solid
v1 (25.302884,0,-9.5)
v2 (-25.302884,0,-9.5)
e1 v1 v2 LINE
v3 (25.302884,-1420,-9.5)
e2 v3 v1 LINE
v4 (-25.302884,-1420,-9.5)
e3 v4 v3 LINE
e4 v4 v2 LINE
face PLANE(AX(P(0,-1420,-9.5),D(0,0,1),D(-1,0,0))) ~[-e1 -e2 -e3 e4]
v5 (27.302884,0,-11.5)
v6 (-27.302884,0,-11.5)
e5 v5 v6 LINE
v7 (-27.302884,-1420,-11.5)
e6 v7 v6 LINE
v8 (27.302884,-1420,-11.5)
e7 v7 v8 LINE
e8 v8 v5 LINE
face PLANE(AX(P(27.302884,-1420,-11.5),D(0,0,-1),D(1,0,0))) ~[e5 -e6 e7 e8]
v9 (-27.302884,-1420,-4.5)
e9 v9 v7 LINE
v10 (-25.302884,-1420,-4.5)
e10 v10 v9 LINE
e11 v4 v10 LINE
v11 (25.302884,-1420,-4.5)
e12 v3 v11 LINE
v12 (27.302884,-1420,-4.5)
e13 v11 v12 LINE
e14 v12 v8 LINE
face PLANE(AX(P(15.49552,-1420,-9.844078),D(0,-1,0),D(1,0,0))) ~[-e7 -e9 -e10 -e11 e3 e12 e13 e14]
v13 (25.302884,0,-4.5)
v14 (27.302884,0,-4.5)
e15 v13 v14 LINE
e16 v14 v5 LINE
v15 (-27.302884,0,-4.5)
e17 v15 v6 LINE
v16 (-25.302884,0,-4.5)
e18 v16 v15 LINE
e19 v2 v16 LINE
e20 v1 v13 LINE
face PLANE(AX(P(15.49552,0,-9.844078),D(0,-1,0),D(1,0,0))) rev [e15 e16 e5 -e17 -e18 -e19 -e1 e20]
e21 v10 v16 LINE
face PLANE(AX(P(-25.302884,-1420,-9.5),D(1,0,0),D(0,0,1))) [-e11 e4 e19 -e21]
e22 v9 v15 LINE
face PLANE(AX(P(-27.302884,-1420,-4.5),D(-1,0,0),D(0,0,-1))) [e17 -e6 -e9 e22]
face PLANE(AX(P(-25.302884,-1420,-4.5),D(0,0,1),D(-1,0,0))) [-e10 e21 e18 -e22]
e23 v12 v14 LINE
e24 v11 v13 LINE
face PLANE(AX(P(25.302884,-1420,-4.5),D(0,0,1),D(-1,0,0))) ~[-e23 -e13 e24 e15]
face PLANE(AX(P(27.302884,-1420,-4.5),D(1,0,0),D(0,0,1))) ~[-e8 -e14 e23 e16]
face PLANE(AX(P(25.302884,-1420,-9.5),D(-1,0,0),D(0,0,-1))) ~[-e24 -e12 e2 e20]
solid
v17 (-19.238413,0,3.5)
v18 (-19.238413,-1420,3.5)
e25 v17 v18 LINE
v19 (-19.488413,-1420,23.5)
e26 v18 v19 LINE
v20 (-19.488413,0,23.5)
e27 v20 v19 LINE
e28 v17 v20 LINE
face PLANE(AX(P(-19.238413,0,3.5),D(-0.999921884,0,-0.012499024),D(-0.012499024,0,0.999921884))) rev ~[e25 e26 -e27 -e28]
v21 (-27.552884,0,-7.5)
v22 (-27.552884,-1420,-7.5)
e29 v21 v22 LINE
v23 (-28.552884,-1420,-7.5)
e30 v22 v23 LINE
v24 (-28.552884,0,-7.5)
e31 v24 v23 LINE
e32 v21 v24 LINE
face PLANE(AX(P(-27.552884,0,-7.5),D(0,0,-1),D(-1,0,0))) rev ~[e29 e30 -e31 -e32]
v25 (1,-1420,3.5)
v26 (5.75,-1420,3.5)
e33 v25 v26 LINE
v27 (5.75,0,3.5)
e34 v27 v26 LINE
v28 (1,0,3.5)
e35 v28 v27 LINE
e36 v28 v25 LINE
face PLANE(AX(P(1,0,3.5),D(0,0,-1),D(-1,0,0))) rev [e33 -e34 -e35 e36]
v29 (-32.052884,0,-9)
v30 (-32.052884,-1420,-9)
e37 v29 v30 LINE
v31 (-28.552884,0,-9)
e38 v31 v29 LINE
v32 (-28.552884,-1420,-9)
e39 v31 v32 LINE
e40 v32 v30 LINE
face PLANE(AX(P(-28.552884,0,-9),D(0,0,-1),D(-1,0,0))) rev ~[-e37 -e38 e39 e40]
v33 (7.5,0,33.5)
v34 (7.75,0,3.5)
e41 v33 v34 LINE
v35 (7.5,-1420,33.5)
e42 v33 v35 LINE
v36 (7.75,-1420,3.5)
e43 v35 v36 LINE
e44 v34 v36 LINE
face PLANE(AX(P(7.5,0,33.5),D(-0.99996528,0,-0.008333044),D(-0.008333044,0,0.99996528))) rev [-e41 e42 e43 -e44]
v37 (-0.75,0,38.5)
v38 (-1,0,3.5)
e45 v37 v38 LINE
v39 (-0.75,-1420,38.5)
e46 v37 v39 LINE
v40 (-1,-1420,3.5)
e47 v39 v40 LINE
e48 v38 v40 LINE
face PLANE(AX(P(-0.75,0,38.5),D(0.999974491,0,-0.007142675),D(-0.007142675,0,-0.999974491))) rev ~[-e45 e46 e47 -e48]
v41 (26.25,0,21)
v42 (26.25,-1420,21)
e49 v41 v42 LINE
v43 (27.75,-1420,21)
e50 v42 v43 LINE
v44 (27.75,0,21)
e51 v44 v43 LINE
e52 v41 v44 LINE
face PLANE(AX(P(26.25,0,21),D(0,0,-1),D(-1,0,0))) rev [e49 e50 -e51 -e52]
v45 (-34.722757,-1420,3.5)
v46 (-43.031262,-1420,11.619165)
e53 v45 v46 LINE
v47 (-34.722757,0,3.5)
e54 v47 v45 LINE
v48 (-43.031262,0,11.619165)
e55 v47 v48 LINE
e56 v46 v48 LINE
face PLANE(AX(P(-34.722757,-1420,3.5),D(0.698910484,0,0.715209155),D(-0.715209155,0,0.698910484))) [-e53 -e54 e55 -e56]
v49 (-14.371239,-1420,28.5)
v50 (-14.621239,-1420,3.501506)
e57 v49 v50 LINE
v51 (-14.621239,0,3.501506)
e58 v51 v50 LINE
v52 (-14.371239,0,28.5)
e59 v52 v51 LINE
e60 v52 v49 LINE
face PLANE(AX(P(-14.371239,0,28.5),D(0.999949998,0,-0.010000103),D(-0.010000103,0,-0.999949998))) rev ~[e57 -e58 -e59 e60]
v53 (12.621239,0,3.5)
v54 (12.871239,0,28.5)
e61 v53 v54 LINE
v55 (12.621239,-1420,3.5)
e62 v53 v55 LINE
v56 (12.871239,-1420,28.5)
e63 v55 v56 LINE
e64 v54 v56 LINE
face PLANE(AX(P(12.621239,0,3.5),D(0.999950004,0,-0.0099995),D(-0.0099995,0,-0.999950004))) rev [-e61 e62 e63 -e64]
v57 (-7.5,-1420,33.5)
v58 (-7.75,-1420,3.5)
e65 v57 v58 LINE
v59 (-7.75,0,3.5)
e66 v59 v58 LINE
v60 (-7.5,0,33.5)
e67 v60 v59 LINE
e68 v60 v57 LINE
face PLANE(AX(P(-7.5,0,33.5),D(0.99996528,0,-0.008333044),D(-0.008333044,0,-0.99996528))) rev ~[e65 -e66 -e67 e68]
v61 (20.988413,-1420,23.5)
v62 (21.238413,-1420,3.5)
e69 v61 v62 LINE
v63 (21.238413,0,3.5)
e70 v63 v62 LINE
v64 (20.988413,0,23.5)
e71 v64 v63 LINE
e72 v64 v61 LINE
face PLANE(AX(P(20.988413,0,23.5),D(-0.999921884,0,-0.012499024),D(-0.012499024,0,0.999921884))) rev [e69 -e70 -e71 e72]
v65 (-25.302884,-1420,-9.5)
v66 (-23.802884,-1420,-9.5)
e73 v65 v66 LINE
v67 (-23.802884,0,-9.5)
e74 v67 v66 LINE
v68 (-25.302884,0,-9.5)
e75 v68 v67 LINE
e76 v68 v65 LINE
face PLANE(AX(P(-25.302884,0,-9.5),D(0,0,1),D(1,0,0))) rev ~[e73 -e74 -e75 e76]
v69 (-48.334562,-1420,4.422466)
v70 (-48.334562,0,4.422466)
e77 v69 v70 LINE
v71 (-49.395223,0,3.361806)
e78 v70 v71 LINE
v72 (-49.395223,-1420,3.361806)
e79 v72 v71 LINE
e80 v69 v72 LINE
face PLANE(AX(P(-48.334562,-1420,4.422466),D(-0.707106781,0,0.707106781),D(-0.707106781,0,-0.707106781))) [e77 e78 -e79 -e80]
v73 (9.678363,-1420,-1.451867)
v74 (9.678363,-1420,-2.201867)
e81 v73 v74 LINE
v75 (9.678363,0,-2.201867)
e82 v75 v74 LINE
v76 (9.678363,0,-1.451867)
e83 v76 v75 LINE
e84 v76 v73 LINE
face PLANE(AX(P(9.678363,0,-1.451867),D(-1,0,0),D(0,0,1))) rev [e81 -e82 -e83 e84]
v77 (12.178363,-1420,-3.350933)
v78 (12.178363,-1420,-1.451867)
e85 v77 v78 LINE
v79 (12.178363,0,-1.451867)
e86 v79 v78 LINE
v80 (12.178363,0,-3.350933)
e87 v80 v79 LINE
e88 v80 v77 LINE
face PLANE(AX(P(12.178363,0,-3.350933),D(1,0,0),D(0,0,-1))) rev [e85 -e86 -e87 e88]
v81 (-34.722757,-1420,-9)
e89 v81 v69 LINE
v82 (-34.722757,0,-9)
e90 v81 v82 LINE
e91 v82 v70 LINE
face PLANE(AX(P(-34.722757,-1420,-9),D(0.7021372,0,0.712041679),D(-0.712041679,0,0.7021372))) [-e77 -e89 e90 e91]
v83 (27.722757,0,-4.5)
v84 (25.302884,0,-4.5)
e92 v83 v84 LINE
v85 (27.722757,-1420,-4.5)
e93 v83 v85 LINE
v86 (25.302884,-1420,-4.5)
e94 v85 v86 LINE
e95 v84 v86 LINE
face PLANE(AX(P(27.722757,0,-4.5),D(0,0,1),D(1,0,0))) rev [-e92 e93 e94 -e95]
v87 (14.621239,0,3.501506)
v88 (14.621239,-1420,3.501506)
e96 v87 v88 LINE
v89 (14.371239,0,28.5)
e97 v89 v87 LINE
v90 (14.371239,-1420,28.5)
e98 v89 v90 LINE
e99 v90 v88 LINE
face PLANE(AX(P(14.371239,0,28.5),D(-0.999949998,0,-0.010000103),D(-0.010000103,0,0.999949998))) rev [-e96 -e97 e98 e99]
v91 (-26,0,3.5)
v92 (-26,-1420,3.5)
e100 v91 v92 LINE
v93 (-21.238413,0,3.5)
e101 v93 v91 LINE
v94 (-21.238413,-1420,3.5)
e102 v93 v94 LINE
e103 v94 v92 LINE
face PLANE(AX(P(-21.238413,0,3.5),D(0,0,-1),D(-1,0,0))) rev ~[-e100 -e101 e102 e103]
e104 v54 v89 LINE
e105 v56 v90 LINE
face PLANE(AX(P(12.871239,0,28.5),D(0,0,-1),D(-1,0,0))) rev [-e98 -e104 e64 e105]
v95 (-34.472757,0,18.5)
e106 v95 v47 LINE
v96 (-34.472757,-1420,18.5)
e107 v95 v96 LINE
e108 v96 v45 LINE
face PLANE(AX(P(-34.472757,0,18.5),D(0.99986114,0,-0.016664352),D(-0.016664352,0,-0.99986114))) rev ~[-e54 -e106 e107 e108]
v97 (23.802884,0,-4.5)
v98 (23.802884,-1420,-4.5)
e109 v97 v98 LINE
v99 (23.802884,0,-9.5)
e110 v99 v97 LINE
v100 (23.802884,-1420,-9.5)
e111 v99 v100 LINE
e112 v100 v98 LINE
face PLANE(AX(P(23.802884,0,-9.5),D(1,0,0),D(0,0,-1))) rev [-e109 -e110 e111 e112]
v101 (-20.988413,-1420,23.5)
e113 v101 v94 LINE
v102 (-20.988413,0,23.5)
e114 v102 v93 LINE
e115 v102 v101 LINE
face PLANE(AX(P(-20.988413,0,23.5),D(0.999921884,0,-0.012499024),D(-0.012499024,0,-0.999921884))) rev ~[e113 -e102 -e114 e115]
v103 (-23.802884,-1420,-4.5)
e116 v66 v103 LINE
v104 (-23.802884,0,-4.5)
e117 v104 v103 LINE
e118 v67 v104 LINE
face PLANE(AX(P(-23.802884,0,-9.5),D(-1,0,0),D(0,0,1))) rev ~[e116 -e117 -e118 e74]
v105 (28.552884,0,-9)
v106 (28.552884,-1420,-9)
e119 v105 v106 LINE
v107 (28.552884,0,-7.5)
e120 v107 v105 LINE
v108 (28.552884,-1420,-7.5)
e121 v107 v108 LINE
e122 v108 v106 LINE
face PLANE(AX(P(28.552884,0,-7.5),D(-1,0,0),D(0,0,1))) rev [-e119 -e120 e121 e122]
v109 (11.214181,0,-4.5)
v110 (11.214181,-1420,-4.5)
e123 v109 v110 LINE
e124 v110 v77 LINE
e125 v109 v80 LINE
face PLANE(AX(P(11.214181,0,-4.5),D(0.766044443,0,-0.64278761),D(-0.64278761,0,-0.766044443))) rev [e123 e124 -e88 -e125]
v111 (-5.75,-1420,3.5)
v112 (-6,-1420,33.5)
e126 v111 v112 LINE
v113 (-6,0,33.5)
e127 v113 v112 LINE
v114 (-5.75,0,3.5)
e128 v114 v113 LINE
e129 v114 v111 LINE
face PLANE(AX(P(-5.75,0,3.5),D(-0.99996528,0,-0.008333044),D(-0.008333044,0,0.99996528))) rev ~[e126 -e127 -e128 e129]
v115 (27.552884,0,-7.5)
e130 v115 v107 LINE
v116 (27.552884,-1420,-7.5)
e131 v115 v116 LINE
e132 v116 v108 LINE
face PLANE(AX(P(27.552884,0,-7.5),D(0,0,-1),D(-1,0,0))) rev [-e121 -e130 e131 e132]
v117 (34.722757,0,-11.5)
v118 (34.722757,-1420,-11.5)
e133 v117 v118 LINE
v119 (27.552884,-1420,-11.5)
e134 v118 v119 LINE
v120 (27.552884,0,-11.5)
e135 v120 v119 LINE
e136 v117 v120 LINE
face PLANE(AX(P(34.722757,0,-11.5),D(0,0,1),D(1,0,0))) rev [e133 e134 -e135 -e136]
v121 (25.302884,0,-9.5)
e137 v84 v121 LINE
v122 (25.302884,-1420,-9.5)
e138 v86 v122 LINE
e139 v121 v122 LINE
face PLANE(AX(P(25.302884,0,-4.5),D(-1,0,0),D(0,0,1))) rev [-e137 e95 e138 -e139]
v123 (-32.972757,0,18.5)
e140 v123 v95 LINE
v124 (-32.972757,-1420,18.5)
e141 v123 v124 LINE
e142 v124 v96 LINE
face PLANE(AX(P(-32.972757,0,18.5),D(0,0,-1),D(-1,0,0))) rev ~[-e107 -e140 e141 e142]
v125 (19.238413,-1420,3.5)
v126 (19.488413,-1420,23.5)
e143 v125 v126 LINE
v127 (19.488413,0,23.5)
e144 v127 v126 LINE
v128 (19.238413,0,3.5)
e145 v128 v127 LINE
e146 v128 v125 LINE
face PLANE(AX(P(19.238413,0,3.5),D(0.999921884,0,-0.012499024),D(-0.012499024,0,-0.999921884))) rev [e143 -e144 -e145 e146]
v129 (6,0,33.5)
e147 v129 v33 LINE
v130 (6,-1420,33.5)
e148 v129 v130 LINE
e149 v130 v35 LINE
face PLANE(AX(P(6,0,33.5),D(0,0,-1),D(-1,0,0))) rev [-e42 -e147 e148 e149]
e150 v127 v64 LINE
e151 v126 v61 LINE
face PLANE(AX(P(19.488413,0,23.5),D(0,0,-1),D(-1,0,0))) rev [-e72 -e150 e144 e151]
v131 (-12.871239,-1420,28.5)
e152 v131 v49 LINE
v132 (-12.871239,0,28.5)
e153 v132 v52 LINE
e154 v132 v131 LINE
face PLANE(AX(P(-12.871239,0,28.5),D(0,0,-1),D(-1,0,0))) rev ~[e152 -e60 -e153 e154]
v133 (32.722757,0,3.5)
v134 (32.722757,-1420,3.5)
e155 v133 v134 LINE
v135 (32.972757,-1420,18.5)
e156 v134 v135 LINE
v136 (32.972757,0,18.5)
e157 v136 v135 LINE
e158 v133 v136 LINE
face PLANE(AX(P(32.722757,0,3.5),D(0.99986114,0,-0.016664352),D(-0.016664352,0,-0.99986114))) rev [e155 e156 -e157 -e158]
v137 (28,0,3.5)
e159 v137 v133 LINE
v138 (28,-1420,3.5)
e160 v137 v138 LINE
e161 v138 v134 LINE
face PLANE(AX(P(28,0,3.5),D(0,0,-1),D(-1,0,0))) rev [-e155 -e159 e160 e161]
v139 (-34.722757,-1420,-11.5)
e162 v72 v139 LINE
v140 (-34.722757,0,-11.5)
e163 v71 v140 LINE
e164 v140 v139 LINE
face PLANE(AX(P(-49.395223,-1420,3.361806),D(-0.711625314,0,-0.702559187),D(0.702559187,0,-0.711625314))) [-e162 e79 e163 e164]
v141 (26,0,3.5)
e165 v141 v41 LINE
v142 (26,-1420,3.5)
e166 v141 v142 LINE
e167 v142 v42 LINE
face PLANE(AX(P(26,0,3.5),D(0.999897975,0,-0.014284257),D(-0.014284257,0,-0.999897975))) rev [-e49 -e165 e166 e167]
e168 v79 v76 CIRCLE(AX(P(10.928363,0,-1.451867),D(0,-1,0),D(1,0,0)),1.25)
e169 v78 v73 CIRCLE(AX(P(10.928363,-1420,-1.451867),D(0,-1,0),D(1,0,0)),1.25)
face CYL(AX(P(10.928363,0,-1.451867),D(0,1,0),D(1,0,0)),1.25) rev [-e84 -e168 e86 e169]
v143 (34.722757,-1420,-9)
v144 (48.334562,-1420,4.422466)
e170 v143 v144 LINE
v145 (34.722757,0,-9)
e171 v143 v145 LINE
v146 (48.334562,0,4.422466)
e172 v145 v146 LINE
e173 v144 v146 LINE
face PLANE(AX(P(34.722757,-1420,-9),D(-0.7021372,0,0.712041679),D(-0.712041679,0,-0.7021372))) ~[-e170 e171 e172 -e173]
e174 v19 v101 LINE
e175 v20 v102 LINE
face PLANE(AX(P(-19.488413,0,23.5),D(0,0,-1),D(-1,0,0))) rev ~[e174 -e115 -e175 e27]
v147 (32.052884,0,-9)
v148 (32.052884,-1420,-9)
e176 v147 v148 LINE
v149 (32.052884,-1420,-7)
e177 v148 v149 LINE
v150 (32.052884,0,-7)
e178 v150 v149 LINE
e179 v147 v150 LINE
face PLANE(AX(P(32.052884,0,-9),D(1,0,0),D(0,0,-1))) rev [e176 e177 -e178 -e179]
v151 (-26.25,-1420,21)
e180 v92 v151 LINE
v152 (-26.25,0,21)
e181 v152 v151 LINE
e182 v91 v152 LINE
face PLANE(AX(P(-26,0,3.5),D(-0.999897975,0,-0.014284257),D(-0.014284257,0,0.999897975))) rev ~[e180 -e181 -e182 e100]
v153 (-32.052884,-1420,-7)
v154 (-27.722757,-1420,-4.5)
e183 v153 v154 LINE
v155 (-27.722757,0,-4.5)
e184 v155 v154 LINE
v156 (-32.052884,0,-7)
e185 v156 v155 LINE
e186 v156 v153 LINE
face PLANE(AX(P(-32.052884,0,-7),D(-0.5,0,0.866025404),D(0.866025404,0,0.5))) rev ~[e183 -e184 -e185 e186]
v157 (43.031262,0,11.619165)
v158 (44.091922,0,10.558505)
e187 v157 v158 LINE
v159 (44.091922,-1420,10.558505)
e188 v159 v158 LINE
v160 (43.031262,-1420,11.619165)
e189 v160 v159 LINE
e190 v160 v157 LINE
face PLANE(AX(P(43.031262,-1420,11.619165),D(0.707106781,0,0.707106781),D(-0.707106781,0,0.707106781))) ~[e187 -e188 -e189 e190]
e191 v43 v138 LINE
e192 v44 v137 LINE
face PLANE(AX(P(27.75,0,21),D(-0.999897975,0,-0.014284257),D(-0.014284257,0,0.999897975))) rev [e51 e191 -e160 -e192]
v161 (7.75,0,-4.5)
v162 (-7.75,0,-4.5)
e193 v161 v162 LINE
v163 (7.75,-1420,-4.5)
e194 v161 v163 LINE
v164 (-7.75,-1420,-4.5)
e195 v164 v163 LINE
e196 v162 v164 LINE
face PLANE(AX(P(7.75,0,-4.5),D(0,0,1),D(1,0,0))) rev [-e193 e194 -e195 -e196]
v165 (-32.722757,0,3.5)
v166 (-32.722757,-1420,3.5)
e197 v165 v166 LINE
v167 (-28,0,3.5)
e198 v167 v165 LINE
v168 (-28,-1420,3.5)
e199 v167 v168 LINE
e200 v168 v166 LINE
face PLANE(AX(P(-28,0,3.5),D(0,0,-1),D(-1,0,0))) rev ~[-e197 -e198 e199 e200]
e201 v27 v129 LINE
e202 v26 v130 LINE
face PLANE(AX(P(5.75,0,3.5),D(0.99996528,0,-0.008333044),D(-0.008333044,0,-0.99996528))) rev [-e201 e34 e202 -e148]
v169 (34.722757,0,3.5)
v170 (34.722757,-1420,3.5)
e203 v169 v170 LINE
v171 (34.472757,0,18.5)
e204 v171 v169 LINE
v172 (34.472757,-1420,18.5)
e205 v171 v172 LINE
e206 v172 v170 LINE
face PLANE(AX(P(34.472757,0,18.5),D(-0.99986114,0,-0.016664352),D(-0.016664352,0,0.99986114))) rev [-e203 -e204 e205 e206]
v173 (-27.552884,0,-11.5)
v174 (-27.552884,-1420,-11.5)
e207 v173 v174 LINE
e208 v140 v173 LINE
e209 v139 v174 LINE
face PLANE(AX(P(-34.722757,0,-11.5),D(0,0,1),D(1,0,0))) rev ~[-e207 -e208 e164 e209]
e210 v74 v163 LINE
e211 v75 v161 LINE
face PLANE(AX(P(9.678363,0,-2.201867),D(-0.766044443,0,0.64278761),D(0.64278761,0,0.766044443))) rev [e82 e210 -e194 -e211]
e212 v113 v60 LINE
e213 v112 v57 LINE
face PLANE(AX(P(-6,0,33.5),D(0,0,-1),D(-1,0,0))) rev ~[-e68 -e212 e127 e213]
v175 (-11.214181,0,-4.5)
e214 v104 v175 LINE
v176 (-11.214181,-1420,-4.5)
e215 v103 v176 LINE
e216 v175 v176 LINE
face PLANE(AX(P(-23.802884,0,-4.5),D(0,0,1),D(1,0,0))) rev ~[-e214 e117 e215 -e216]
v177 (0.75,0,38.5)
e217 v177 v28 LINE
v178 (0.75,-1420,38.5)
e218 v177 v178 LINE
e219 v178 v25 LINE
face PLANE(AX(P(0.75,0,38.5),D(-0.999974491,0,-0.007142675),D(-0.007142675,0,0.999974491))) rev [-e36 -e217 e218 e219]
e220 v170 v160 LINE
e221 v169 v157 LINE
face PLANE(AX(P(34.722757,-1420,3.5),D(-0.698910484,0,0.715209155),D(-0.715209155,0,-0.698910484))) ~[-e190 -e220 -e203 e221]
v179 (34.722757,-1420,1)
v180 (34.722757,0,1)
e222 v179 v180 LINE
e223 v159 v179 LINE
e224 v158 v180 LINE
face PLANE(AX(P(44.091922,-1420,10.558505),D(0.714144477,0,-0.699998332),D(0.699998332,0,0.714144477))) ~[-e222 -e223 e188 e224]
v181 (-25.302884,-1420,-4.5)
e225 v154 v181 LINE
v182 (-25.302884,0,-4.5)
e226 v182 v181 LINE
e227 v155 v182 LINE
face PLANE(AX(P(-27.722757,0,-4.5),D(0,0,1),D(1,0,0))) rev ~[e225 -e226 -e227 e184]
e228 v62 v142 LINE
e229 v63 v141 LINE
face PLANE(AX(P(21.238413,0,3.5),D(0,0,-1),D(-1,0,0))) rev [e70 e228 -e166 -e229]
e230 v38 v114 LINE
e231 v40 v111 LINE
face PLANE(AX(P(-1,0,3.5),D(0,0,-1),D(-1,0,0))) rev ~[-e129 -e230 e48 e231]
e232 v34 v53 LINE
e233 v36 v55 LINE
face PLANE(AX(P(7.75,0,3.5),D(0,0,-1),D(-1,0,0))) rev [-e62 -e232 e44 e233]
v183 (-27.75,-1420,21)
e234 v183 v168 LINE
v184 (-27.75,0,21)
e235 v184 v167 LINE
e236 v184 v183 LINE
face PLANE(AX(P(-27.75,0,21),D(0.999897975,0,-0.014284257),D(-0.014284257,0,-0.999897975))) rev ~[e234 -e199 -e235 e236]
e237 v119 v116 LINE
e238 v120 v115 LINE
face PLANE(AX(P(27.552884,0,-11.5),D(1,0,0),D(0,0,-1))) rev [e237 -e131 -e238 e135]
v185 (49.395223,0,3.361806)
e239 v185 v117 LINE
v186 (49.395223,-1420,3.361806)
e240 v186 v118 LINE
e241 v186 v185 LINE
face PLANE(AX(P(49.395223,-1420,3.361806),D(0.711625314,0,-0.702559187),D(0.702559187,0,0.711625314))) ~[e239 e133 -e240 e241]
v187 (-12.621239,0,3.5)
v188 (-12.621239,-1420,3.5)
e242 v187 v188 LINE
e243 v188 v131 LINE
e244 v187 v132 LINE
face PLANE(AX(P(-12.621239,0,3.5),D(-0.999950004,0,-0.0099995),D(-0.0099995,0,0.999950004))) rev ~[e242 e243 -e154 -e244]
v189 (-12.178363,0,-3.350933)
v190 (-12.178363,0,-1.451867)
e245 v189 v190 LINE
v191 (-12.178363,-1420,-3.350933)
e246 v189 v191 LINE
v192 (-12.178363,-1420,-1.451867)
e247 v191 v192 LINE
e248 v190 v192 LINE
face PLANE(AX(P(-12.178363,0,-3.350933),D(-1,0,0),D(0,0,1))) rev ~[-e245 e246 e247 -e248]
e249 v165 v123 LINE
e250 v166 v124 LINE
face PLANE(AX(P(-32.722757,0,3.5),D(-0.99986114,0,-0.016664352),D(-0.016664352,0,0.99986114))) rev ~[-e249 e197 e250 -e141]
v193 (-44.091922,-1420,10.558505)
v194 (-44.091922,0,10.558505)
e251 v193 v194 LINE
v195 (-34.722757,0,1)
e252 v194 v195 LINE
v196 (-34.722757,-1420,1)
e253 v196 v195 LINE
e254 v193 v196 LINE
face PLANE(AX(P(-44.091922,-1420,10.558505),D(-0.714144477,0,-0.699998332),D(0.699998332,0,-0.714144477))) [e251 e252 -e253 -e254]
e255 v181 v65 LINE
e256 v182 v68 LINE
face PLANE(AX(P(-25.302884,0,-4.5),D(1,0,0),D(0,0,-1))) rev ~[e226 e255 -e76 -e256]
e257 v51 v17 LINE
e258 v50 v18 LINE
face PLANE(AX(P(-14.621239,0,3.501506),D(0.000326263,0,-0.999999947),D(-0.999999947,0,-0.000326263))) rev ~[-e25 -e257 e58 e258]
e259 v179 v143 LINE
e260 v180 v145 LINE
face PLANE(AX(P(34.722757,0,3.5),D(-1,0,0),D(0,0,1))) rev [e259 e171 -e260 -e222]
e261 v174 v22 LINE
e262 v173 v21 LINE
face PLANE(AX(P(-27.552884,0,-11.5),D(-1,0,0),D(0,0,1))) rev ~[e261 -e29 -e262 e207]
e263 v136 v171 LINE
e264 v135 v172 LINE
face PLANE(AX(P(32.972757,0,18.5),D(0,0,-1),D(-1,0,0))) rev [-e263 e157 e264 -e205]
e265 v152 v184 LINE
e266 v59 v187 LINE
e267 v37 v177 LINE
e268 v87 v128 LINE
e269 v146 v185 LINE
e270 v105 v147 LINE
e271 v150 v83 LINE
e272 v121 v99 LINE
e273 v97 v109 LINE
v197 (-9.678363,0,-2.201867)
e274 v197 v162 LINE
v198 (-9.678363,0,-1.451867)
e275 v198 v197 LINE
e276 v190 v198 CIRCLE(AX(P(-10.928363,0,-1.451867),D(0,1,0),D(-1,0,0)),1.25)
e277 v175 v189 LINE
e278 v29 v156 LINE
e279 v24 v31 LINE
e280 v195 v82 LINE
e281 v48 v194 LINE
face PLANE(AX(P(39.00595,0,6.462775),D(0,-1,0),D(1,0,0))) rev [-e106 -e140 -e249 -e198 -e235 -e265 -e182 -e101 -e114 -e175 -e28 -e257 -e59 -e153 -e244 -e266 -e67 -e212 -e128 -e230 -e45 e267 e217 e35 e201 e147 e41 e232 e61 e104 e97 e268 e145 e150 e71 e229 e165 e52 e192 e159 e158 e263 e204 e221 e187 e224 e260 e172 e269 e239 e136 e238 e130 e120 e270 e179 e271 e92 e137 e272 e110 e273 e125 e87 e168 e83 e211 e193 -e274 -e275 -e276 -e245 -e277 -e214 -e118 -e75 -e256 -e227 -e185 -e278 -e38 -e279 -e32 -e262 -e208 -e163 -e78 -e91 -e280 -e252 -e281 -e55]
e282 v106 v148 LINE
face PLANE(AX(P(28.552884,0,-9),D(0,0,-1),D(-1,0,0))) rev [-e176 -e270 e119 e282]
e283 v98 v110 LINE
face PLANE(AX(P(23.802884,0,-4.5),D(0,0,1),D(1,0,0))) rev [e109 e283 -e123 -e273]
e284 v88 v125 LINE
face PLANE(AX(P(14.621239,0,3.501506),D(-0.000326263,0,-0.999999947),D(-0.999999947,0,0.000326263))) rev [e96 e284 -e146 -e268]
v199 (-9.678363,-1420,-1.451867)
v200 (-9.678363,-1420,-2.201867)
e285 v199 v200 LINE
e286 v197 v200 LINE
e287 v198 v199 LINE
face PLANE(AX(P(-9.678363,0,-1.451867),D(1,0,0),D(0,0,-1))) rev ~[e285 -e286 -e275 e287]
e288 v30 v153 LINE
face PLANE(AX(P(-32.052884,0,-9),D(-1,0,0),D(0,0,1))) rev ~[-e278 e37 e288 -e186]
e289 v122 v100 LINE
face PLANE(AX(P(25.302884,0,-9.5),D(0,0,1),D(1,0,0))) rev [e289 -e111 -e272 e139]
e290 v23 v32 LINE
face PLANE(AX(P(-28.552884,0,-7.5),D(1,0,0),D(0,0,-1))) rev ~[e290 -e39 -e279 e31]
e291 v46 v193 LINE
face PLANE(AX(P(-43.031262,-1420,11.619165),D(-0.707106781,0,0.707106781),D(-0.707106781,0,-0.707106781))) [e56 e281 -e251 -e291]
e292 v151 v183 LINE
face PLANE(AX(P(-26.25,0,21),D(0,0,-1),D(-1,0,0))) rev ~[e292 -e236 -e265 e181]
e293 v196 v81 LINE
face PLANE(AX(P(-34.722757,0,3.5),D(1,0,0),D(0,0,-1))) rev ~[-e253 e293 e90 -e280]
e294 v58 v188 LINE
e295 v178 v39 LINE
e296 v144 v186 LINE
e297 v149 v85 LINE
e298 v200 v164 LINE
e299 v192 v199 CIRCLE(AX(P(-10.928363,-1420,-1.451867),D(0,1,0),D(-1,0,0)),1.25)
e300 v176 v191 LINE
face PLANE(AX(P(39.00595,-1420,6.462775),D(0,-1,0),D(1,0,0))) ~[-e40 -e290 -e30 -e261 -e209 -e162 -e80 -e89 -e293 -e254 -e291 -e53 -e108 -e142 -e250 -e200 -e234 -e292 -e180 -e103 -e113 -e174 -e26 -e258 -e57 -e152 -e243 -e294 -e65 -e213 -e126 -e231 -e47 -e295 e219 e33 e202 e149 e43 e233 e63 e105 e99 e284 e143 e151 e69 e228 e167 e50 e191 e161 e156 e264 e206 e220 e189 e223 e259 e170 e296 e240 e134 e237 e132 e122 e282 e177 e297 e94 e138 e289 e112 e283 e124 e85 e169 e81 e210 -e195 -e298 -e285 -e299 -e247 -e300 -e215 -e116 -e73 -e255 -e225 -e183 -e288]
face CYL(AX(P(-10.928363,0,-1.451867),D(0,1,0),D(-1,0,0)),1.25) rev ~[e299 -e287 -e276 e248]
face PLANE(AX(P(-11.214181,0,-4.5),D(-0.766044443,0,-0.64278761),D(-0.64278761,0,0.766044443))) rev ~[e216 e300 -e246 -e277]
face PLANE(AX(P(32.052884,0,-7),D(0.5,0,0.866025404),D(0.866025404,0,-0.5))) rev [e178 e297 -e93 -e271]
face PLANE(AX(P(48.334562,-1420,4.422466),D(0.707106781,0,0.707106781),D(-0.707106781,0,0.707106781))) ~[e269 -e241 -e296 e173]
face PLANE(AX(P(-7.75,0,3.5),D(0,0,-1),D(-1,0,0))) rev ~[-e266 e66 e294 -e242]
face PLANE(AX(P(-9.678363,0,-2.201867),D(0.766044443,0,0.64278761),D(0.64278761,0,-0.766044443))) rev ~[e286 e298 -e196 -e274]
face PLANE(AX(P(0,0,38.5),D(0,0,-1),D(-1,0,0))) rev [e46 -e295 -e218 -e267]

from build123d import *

# Parameters (mm, degrees)
F1_DEPTH = 1420
F3_DEPTH = 1420
F5_DEPTH = 1420


with BuildPart() as f1:
    # F0 (on Front) → F1 (new body)
    with BuildSketch(Plane.XZ):
        with BuildLine():
            Line((-32.7227568555, 3.4999999998), (-32.9727568555, 18.4999999998))
            Line((-32.9727568555, 18.4999999998), (-34.4727568555, 18.4999999998))
            Line((-34.4727568555, 18.4999999998), (-34.7227568555, 3.4999999998))
            Line((-34.7227568555, 3.4999999998), (-34.7227568555, -11.5000000002))
            Line((-34.7227568555, -11.5000000002), (-27.5528838745, -11.5000000002))
            Line((-27.5528838745, -11.5000000002), (-27.5528838745, -7.5000000002))
            Line((-27.5528838745, -7.5000000002), (-28.5528838745, -7.5000000002))
            Line((-28.5528838745, -7.5000000002), (-28.5528838745, -9.0000000002))
            Line((-28.5528838745, -9.0000000002), (-32.0528838745, -9.0000000002))
            Line((-32.0528838745, -9.0000000002), (-32.0528838745, -7.0000000002))
            Line((-32.0528838745, -7.0000000002), (-27.7227568555, -4.5000000002))
            Line((-27.7227568555, -4.5000000002), (-27.1091535687, -4.5000000002))
            Line((-27.1091535687, -4.5000000002), (-25.3028838745, -4.5000000002))
            Line((-25.3028838745, -4.5000000002), (-25.3028838745, -9.5000000002))
            Line((-25.3028838745, -9.5000000002), (-23.8028838745, -9.5000000002))
            Line((-23.8028838745, -9.5000000002), (-23.8028838745, -4.5000000002))
            Line((-23.8028838745, -4.5000000002), (-11.2141814145, -4.5000000002))
            Line((-11.2141814145, -4.5000000002), (-12.1783628291, -3.3509333355))
            Line((-12.1783628291, -3.3509333355), (-12.1783628291, -1.4518666708))
            ThreePointArc((-12.1783628291, -1.4518666708), (-10.9283628291, -0.2018666708), (-9.6783628291, -1.4518666708))
            Line((-9.6783628291, -1.4518666708), (-9.6783628291, -2.2018666708))
            Line((-9.6783628291, -2.2018666708), (-7.75, -4.5000000002))
            Line((-7.75, -4.5000000002), (0, -4.5000000002))
            Line((0, -4.5000000002), (0, 38.4999999998))
            Line((0, 38.4999999998), (-0.75, 38.4999999998))
            Line((-0.75, 38.4999999998), (-1, 3.4999999998))
            Line((-1, 3.4999999998), (-5.75, 3.4999999998))
            Line((-5.75, 3.4999999998), (-6, 33.4999999998))
            Line((-6, 33.4999999998), (-7.5, 33.4999999998))
            Line((-7.5, 33.4999999998), (-7.75, 3.4999999998))
            Line((-7.75, 3.4999999998), (-12.6212390675, 3.4999999998))
            Line((-12.6212390675, 3.4999999998), (-12.8712390675, 28.4999999998))
            Line((-12.8712390675, 28.4999999998), (-14.3712390675, 28.4999999998))
            Line((-14.3712390675, 28.4999999998), (-14.6212390675, 3.5015064141))
            Line((-14.6212390675, 3.5015064141), (-19.2384126596, 3.4999999998))
            Line((-19.2384126596, 3.4999999998), (-19.4884126596, 23.4999999998))
            Line((-19.4884126596, 23.4999999998), (-20.9884126596, 23.4999999998))
            Line((-20.9884126596, 23.4999999998), (-21.2384126596, 3.4999999998))
            Line((-21.2384126596, 3.4999999998), (-26, 3.4999999998))
            Line((-26, 3.4999999998), (-26.25, 20.9999999998))
            Line((-26.25, 20.9999999998), (-27.75, 20.9999999998))
            Line((-27.75, 20.9999999998), (-28, 3.4999999998))
            Line((-28, 3.4999999998), (-32.7227568555, 3.4999999998))
        make_face()
    extrude(amount=F1_DEPTH)

    # F2 (on face) → F3 (join)
    with BuildSketch(Plane.XZ.offset(1420)):
        Polygon((-44.0919217063, 10.5585046788), (-34.7227568555, 0.9999999998), (-34.7227568555, 3.4999999998), (-43.0312615345, 11.6191648506), align=None)
        Polygon((-49.3952225652, 3.3618055377), (-34.7227568555, -11.5000000002), (-34.7227568555, -9.0000000002), (-48.3345623934, 4.4224657095), align=None)
    extrude(amount=-F3_DEPTH)

    # F6: F1 across face


with BuildPart() as f5:
    # F4 (on face) → F5 (new body)
    with BuildSketch(Plane.XZ.offset(1420)):
        Polygon((-25.3028838745, -9.5000000002), (-25.3028838745, -4.5000000002), (-27.3028838745, -4.5000000002), (-27.3028838745, -11.5000000002), (0, -11.5000000002), (0, -9.5000000002), align=None)
    extrude(amount=-F5_DEPTH)

    # F7: F5 across face


with BuildPart() as f1_1:
    add(f1.part)
    add(f1.part.mirror(Plane(origin=(0, -710, 16.9999999998), x_dir=(0, 1, 0), z_dir=(1, 0, 0))))


with BuildPart() as f5_1:
    add(f5.part)
    add(f5.part.mirror(Plane(origin=(0, -710, -10.5000000002), x_dir=(0, 1, 0), z_dir=(1, 0, 0))))


solid = Compound([f1_1.part, f5_1.part])
